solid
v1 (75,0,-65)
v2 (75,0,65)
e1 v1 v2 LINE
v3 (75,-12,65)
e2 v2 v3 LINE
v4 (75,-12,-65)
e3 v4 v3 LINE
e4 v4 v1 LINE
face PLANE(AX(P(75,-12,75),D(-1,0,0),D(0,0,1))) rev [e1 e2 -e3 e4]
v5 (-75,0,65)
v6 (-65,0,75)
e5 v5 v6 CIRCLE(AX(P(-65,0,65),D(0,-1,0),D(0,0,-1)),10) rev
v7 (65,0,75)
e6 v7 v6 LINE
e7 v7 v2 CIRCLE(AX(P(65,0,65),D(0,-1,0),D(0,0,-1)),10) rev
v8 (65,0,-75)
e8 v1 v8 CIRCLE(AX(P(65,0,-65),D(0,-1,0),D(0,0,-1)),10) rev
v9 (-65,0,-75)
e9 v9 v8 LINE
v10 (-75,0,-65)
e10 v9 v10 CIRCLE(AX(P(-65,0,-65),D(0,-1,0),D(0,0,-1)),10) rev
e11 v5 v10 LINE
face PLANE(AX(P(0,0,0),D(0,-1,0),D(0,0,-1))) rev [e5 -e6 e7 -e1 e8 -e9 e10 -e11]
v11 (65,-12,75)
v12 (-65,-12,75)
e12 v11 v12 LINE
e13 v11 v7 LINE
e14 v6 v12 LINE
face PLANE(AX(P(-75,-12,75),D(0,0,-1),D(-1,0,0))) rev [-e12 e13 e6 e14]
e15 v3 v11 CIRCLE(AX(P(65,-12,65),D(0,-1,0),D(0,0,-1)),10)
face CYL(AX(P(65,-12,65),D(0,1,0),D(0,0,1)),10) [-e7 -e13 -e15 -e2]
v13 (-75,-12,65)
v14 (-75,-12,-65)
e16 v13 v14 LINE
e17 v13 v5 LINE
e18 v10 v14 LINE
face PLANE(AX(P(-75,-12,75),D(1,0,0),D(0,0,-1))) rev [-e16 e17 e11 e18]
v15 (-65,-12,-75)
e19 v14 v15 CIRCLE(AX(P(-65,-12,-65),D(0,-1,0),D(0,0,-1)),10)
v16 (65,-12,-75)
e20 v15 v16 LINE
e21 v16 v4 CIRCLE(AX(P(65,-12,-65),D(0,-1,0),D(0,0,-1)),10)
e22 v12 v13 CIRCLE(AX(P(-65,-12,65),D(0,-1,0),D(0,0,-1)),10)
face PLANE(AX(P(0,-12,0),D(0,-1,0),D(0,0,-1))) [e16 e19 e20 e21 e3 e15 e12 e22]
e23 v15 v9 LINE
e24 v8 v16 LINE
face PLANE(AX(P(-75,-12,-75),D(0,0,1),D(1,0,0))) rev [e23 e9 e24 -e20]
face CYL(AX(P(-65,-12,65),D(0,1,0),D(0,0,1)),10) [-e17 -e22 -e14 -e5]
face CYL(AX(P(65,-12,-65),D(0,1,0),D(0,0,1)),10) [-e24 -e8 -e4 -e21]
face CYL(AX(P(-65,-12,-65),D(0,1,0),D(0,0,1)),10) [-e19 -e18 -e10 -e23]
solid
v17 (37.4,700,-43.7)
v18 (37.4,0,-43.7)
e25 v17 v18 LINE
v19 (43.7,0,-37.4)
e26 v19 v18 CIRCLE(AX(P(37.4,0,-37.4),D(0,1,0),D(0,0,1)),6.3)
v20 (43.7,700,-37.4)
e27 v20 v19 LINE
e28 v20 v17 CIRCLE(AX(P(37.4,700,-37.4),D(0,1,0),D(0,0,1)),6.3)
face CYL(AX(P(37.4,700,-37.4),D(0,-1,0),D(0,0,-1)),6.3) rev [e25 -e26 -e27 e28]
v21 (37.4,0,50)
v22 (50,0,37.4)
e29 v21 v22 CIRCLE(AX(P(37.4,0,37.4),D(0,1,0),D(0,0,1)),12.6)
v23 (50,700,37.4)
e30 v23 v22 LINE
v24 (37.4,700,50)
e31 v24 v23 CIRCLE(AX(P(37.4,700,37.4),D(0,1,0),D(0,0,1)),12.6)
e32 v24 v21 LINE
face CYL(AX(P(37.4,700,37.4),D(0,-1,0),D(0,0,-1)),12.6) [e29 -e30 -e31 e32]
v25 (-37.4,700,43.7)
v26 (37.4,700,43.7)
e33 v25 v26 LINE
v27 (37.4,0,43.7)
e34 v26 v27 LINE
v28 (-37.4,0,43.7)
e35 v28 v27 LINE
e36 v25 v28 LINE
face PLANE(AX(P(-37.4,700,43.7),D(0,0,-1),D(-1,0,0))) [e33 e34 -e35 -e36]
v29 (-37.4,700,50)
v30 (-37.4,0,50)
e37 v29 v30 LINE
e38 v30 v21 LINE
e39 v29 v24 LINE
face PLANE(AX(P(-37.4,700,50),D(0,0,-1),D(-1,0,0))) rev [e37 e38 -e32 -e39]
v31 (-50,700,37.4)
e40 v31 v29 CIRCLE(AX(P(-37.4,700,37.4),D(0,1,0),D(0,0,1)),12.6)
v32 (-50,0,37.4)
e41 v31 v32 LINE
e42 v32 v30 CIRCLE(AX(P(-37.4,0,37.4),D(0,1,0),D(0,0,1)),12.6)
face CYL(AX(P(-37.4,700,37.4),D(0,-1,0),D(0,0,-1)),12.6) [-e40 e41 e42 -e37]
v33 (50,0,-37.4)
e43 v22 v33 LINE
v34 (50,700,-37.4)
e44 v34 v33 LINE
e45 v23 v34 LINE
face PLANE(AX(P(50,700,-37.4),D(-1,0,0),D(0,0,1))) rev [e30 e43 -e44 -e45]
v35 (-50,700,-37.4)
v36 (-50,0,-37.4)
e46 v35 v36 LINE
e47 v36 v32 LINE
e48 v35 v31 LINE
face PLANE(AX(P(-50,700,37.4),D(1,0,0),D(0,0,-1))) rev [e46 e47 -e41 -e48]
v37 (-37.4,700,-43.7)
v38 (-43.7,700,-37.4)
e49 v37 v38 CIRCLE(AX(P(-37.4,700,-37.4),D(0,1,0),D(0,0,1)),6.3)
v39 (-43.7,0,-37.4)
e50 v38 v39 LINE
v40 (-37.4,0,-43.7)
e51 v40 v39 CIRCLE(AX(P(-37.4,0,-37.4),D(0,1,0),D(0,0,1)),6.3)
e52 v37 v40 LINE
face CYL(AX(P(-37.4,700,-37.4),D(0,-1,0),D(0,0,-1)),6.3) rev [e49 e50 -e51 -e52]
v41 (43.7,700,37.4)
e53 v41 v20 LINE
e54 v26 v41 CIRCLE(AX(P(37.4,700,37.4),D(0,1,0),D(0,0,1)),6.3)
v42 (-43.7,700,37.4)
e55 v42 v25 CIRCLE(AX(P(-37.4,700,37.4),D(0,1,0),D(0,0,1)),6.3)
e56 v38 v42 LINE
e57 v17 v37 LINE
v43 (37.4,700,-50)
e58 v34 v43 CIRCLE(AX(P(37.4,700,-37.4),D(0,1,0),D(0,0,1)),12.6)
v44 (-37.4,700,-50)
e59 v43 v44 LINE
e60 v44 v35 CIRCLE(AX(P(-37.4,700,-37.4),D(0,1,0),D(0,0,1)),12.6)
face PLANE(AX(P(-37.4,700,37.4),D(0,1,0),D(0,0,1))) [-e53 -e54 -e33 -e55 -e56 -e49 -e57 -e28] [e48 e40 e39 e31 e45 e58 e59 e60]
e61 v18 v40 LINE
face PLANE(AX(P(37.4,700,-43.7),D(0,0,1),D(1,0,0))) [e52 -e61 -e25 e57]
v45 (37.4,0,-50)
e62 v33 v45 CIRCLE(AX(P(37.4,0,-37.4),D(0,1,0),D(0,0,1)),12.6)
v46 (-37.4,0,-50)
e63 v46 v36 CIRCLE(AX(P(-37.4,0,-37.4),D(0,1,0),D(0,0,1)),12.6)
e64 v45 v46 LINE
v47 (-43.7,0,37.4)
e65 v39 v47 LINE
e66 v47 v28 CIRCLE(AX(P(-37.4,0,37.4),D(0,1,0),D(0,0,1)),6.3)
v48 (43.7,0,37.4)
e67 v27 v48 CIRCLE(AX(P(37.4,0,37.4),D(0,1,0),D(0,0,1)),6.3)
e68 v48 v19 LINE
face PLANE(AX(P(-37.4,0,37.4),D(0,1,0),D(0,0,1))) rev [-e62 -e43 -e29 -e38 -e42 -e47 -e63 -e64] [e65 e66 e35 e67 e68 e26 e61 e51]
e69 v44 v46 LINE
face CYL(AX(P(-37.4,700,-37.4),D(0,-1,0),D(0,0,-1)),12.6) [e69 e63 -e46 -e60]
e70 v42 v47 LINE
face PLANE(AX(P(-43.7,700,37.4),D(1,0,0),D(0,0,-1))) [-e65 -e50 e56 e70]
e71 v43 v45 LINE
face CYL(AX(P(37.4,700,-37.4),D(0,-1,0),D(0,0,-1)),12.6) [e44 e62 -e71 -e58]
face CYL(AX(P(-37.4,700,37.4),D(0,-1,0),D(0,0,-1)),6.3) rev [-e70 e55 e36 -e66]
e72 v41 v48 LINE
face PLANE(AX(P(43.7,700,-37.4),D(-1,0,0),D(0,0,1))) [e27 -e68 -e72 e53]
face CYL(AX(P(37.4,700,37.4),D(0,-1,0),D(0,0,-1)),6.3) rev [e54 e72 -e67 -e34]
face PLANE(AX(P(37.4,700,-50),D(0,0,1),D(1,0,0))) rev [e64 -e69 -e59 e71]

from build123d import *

# Parameters (mm, degrees)
TUBE_SQUARE_100_X_100_X_6_3_1_DEPTH = 700
SKETCH12_W                          = 150
SKETCH12_H                          = 150
BASE_FLANGE1_DEPTH                  = 12
BREAK_CORNER1_START                 = -12
BREAK_CORNER1_DEPTH                 = 12


# Read off the part's stored shape, not the designer's step: Break-Corner1
# Sheet-metal steps are written as plain solids
with BuildPart() as part:
    # Sketch11 → Tube (square) 100 X 100 X 6.3(1) (new body)
    with BuildSketch(Plane(origin=(0, 0, 0), x_dir=(-1, 0, 0), z_dir=(0, 1, 0))):
        with BuildLine():
            Line((-37.4, -50), (37.4, -50))
            ThreePointArc((37.4, -50), (46.309545443, -46.309545443), (50, -37.4))
            Line((50, -37.4), (50, 37.4))
            ThreePointArc((50, 37.4), (46.309545443, 46.309545443), (37.4, 50))
            Line((37.4, 50), (-37.4, 50))
            ThreePointArc((-37.4, 50), (-46.309545443, 46.309545443), (-50, 37.4))
            Line((-50, 37.4), (-50, -37.4))
            ThreePointArc((-50, -37.4), (-46.309545443, -46.309545443), (-37.4, -50))
        make_face()
        with BuildLine():
            Line((-37.4, -43.7), (37.4, -43.7))
            ThreePointArc((37.4, -43.7), (41.854772721, -41.854772721), (43.7, -37.4))
            Line((43.7, -37.4), (43.7, 37.4))
            ThreePointArc((43.7, 37.4), (41.854772721, 41.854772721), (37.4, 43.7))
            Line((37.4, 43.7), (-37.4, 43.7))
            ThreePointArc((-37.4, 43.7), (-41.854772721, 41.854772721), (-43.7, 37.4))
            Line((-43.7, 37.4), (-43.7, -37.4))
            ThreePointArc((-43.7, -37.4), (-41.854772721, -41.854772721), (-37.4, -43.7))
        make_face(mode=Mode.SUBTRACT)
    extrude(amount=TUBE_SQUARE_100_X_100_X_6_3_1_DEPTH)


with BuildPart() as body_2:
    # Sketch12 → Base-Flange1 (new body)
    with BuildSketch(Plane.XZ):
        Rectangle(SKETCH12_W, SKETCH12_H)
    extrude(amount=BASE_FLANGE1_DEPTH)

    # Break-Corner1 outline → Break-Corner1 (cut)
    with BuildSketch(Plane(origin=(0, 0, 0), x_dir=(1, 0, 0), z_dir=(0, 1, 0)).offset(BREAK_CORNER1_START)):
        with BuildLine():
            ThreePointArc((-75, 65), (-72.071067812, 72.071067812), (-65, 75))
            Line((-65, 75), (-75, 75))
            Line((-75, 75), (-75, 65))
        make_face()
        with BuildLine():
            Line((75, 75), (65, 75))
            ThreePointArc((65, 75), (72.071067812, 72.071067812), (75, 65))
            Line((75, 65), (75, 75))
        make_face()
        with BuildLine():
            ThreePointArc((-65, -75), (-72.071067812, -72.071067812), (-75, -65))
            Line((-75, -65), (-75, -75))
            Line((-75, -75), (-65, -75))
        make_face()
        with BuildLine():
            Line((75, -75), (75, -65))
            ThreePointArc((75, -65), (72.071067812, -72.071067812), (65, -75))
            Line((65, -75), (75, -75))
        make_face()
    extrude(amount=BREAK_CORNER1_DEPTH, mode=Mode.SUBTRACT)


solid = Compound([part.part, body_2.part])
